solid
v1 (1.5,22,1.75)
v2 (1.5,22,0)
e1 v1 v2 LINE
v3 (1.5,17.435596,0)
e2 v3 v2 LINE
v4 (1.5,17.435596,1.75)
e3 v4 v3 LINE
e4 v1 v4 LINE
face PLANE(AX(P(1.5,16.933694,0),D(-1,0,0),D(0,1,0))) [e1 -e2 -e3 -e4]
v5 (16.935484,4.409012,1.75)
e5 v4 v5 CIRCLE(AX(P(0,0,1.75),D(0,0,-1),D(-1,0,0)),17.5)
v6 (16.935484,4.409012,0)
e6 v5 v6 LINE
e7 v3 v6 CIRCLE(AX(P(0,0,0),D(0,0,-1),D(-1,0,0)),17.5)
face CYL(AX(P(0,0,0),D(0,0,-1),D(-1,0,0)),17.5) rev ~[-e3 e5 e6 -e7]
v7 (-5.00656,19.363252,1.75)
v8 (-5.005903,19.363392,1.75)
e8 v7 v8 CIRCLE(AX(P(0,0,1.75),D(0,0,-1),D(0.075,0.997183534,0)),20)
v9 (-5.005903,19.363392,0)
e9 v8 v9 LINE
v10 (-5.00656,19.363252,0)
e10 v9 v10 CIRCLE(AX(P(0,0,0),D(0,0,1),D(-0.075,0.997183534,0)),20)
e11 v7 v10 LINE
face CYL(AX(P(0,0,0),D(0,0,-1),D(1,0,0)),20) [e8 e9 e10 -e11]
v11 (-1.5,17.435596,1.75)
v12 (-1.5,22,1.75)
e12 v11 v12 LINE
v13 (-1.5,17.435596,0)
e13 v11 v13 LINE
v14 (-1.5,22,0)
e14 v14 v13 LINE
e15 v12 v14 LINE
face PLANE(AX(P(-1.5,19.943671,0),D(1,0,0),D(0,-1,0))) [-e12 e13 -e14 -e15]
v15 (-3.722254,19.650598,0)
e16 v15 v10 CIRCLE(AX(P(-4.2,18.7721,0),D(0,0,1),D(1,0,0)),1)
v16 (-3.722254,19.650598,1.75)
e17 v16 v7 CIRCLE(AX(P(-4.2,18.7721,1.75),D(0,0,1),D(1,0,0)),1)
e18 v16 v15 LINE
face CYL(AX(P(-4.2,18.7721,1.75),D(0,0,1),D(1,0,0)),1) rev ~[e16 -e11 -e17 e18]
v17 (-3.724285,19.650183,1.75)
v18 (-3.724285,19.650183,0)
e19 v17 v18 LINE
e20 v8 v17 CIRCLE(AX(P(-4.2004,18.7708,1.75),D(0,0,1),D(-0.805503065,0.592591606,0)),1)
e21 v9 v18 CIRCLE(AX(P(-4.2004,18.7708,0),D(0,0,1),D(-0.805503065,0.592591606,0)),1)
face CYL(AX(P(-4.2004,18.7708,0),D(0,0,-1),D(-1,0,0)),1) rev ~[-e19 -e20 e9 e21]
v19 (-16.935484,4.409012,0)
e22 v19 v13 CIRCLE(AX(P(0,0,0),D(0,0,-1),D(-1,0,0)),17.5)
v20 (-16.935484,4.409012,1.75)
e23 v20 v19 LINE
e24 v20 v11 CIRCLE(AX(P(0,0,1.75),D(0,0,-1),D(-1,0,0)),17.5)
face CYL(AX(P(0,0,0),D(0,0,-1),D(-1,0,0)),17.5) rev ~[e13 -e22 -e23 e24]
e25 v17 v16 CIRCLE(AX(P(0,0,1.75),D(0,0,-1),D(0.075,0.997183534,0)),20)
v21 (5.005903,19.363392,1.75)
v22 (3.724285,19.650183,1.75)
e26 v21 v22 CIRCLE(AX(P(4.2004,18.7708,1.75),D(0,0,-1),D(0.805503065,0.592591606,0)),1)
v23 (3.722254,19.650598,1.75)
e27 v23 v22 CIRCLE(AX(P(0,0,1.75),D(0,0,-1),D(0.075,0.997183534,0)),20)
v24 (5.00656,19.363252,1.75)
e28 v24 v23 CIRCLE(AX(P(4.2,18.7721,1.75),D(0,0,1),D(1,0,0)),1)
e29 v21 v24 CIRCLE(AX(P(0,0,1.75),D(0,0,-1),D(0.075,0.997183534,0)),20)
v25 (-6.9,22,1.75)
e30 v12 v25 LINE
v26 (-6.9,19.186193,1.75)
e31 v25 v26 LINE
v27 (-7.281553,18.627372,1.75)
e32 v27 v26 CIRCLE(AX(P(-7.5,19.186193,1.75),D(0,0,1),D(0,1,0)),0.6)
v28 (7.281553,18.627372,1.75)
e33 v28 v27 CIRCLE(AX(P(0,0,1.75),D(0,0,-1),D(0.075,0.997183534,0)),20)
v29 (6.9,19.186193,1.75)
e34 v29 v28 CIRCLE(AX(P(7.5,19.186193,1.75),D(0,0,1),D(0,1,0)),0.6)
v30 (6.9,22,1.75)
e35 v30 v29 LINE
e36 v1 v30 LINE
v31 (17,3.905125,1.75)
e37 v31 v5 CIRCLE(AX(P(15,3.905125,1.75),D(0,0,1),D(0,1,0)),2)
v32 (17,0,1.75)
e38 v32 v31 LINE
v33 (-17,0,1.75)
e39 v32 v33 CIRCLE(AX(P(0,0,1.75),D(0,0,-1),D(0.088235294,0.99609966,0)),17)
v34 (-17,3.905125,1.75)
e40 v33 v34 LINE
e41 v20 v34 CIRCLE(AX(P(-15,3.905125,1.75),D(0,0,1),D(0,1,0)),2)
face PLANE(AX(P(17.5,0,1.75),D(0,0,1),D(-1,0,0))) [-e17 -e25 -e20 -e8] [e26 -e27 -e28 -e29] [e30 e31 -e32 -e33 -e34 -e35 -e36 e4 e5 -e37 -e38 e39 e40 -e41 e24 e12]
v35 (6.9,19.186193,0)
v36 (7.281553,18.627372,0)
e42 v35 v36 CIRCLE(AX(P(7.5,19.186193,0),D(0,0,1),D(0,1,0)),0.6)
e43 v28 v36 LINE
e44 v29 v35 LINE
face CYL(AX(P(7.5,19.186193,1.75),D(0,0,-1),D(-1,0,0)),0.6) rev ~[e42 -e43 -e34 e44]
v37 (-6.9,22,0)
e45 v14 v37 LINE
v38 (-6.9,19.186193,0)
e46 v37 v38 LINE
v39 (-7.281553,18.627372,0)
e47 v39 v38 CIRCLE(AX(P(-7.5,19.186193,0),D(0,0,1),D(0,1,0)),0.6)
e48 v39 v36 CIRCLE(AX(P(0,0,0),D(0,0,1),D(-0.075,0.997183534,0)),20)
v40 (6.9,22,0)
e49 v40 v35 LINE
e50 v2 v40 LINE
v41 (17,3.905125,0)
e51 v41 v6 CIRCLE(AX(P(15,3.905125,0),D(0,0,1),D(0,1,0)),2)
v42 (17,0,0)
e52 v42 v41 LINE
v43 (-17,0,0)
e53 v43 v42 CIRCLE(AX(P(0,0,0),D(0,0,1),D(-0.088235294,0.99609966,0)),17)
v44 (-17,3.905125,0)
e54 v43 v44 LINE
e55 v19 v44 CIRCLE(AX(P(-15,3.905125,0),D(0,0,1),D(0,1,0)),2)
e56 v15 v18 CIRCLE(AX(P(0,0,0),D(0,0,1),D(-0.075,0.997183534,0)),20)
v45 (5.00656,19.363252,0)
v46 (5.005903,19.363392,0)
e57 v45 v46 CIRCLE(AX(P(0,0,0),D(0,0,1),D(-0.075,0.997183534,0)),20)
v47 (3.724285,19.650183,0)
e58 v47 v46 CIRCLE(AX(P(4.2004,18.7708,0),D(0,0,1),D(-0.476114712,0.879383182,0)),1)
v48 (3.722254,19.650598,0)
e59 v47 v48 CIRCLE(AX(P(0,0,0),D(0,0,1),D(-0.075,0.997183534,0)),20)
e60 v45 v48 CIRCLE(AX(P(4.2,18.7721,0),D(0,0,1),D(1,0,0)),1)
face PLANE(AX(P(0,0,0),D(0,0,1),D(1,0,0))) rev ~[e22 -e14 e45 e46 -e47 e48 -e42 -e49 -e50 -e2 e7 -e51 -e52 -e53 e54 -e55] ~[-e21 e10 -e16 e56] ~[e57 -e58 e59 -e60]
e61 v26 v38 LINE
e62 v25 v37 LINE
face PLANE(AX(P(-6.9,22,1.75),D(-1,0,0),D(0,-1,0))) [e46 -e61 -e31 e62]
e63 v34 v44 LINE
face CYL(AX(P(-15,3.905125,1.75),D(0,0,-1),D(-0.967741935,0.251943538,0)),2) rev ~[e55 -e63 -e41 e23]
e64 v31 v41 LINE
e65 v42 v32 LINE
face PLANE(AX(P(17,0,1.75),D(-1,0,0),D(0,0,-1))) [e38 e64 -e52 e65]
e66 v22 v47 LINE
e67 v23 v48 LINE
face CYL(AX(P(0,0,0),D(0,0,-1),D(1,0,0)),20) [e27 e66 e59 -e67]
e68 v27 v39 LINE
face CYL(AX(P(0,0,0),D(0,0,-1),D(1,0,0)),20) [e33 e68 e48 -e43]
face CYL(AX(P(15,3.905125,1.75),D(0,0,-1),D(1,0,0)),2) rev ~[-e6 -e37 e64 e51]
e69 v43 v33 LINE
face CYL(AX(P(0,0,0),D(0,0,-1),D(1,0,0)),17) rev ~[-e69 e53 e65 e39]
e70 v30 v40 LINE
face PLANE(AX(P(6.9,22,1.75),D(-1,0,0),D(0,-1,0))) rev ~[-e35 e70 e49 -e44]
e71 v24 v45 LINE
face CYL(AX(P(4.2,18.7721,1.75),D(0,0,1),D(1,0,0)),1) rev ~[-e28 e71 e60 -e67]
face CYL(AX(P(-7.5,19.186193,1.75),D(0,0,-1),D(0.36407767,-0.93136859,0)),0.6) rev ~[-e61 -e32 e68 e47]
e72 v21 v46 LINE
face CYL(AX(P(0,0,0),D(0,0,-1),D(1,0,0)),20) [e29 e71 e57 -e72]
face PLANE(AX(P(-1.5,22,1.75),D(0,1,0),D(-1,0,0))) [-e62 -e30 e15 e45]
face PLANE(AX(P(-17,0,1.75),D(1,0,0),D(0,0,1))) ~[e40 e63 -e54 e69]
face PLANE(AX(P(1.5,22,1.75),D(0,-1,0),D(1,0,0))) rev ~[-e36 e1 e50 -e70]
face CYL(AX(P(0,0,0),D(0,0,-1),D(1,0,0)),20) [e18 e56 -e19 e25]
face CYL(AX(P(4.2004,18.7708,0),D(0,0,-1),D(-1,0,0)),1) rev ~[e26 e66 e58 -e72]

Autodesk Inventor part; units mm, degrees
ref_plane "YZ Plane" through (0, 0, 0) normal (1, 0, 0) x (0, 1, 0)
ref_plane "XZ Plane" through (0, 0, 0) normal (0, 1, 0) x (-1, 0, 0)
ref_plane "XY Plane" through (0, 0, 0) normal (0, 0, 1) x (1, 0, 0)
sketch "Sketch1" plane through (0, 0, 0) normal (0, 0, 1) x (1, 0, 0)
  circle A0 centre (0, 0) radius 17
  circle A1 centre (0, 0) radius 20
  line L0 (-20, 0) -> (20, 0)
  line L1 (0, 0) -> (0, 20.9298)
  line L2 (0, 20.9298) -> (1.5, 20.9298)
  line L3 (1.5, 20.9298) -> (-1.5, 20.9298)
  line L4 (-1.5, 20.9298) -> (-1.5, 15.3128)
  line L5 (-1.5, 15.3128) -> (1.5, 15.3128)
  line L6 (1.5, 15.3128) -> (1.5, 20.9298)
  line L7 (-20, 0) -> (20, 0)
  point P0 (1.5, 19.9437)
  point P1 (1.5, 16.9337)
  point P2 (-1.5, 16.9337)
  point P3 (-1.5, 19.9437)
  dimension "d0" = 34
  dimension "d1" = 40
  dimension "d2" = 1.5
  dimension "d3" = 3
extrude "Extrusion1" add sketch "Sketch1" along normal blind 1.75 contours L0 A1 A0 | A0 L6 A1 L0 | L0 A1 L4 A0
sketch "Sketch2" plane through (0, 0, 1.75) normal (0, 0, 1) x (1, 0, 0)
  arc A0 (-1.5, 19.9437) -> (1.5, 19.9437) centre (0, 0) ccw projected
  line L0 (0, -20) -> (0, 22)
  line L1 (1.5, 22) -> (6.9, 22)
  line L2 (6.9, 22) -> (6.9, 18.7721)
  line L3 (1.5, 22) -> (1.5, 19.9437)
  arc A1 (-1.5, 19.9437) -> (1.5, 19.9437) centre (0, 0) ccw
  line L4 (-1.5, 22) -> (-6.9, 22)
  line L5 (-6.9, 22) -> (-6.9, 18.7721)
  line L6 (-1.5, 22) -> (-1.5, 19.9437)
  circle A2 centre (-4.2, 18.7721) radius 1
  circle A3 centre (4.2, 18.7721) radius 1
  point P0 (3.7223, 19.6506)
  point P1 (5.0065, 19.3632)
  point P2 (-5.0065, 19.3632)
  point P3 (-3.7223, 19.6506)
  dimension "d7" = 5.4
  dimension "d8" = 2
  dimension "d9" = 2
extrude "Extrusion2" add sketch "Sketch2" against normal blind 1.75 contours A0 A2 L5 L4 L6 | A0 A3 L3 L1 L2
sketch "Sketch3" plane through (0, 0, 0) normal (0, 0, -1) x (-1, 0, 0)
  circle A0 centre (-4.2004, 18.7708) radius 1
  line L0 (0, 22.648) -> (0, 15.9884)
  circle A1 centre (4.2004, 18.7708) radius 1
  point P0 (0, 0)
  dimension "d12" = 2
extrude "Extrusion3" cut sketch "Sketch3" against normal blind 10
fillet "Fillet1" radius 0.6 2 edges at (6.9, 18.7721, 0.875) (-6.9, 18.7721, 0.875)
sketch "Sketch4" plane through (0, 0, 0) normal (0, 0, -1) x (-1, 0, 0)
  circle A0 centre (0, 0) radius 17.5
  line L0 (-17.5, 0) -> (17.5, 0)
  circle A1 centre (0, 0) radius 17
  point P0 (-17, 0)
  point P1 (17, 0)
  dimension "d16" = 35
extrude "Extrusion4" cut sketch "Sketch4" against normal blind 10 contours L0 A1 A0 picked at (-7.3917, 15.5534)
sketch "Sketch5" plane through (17, 0, 0) normal (0, 1, 0) x (1, 0, 0)
  line L0 (0.5, -1.75) -> (0, -1.75) projected
  line L1 (0, 0) -> (0.5, 0) projected
  line L2 (0.5, -1.75) -> (0, -1.75)
  line L3 (0, -1.75) -> (0, 0)
  line L4 (0, 0) -> (0.5, 0)
  line L5 (0.5, 0) -> (0.5, -1.75)
  point P0 (-17, 0)
  point P1 (0, -1.75)
extrude "Extrusion5" add sketch "Sketch5" along normal blind 5
fillet "Fillet2" radius 2 1 edges at (17, 4.1533, 0.875)
sketch "Sketch6" plane through (17, 0, 0) normal (-1, 0, 0) x (0, 0, 1)
  point P0 (0, 0)
mirror "Mirror1" about plane through (0, 0, 0) normal (1, 0, 0) of "Extrusion5"
fillet "Fillet3" radius 2 1 edges at (-17, 4.1533, 0.875)
properties part number "cockring"
